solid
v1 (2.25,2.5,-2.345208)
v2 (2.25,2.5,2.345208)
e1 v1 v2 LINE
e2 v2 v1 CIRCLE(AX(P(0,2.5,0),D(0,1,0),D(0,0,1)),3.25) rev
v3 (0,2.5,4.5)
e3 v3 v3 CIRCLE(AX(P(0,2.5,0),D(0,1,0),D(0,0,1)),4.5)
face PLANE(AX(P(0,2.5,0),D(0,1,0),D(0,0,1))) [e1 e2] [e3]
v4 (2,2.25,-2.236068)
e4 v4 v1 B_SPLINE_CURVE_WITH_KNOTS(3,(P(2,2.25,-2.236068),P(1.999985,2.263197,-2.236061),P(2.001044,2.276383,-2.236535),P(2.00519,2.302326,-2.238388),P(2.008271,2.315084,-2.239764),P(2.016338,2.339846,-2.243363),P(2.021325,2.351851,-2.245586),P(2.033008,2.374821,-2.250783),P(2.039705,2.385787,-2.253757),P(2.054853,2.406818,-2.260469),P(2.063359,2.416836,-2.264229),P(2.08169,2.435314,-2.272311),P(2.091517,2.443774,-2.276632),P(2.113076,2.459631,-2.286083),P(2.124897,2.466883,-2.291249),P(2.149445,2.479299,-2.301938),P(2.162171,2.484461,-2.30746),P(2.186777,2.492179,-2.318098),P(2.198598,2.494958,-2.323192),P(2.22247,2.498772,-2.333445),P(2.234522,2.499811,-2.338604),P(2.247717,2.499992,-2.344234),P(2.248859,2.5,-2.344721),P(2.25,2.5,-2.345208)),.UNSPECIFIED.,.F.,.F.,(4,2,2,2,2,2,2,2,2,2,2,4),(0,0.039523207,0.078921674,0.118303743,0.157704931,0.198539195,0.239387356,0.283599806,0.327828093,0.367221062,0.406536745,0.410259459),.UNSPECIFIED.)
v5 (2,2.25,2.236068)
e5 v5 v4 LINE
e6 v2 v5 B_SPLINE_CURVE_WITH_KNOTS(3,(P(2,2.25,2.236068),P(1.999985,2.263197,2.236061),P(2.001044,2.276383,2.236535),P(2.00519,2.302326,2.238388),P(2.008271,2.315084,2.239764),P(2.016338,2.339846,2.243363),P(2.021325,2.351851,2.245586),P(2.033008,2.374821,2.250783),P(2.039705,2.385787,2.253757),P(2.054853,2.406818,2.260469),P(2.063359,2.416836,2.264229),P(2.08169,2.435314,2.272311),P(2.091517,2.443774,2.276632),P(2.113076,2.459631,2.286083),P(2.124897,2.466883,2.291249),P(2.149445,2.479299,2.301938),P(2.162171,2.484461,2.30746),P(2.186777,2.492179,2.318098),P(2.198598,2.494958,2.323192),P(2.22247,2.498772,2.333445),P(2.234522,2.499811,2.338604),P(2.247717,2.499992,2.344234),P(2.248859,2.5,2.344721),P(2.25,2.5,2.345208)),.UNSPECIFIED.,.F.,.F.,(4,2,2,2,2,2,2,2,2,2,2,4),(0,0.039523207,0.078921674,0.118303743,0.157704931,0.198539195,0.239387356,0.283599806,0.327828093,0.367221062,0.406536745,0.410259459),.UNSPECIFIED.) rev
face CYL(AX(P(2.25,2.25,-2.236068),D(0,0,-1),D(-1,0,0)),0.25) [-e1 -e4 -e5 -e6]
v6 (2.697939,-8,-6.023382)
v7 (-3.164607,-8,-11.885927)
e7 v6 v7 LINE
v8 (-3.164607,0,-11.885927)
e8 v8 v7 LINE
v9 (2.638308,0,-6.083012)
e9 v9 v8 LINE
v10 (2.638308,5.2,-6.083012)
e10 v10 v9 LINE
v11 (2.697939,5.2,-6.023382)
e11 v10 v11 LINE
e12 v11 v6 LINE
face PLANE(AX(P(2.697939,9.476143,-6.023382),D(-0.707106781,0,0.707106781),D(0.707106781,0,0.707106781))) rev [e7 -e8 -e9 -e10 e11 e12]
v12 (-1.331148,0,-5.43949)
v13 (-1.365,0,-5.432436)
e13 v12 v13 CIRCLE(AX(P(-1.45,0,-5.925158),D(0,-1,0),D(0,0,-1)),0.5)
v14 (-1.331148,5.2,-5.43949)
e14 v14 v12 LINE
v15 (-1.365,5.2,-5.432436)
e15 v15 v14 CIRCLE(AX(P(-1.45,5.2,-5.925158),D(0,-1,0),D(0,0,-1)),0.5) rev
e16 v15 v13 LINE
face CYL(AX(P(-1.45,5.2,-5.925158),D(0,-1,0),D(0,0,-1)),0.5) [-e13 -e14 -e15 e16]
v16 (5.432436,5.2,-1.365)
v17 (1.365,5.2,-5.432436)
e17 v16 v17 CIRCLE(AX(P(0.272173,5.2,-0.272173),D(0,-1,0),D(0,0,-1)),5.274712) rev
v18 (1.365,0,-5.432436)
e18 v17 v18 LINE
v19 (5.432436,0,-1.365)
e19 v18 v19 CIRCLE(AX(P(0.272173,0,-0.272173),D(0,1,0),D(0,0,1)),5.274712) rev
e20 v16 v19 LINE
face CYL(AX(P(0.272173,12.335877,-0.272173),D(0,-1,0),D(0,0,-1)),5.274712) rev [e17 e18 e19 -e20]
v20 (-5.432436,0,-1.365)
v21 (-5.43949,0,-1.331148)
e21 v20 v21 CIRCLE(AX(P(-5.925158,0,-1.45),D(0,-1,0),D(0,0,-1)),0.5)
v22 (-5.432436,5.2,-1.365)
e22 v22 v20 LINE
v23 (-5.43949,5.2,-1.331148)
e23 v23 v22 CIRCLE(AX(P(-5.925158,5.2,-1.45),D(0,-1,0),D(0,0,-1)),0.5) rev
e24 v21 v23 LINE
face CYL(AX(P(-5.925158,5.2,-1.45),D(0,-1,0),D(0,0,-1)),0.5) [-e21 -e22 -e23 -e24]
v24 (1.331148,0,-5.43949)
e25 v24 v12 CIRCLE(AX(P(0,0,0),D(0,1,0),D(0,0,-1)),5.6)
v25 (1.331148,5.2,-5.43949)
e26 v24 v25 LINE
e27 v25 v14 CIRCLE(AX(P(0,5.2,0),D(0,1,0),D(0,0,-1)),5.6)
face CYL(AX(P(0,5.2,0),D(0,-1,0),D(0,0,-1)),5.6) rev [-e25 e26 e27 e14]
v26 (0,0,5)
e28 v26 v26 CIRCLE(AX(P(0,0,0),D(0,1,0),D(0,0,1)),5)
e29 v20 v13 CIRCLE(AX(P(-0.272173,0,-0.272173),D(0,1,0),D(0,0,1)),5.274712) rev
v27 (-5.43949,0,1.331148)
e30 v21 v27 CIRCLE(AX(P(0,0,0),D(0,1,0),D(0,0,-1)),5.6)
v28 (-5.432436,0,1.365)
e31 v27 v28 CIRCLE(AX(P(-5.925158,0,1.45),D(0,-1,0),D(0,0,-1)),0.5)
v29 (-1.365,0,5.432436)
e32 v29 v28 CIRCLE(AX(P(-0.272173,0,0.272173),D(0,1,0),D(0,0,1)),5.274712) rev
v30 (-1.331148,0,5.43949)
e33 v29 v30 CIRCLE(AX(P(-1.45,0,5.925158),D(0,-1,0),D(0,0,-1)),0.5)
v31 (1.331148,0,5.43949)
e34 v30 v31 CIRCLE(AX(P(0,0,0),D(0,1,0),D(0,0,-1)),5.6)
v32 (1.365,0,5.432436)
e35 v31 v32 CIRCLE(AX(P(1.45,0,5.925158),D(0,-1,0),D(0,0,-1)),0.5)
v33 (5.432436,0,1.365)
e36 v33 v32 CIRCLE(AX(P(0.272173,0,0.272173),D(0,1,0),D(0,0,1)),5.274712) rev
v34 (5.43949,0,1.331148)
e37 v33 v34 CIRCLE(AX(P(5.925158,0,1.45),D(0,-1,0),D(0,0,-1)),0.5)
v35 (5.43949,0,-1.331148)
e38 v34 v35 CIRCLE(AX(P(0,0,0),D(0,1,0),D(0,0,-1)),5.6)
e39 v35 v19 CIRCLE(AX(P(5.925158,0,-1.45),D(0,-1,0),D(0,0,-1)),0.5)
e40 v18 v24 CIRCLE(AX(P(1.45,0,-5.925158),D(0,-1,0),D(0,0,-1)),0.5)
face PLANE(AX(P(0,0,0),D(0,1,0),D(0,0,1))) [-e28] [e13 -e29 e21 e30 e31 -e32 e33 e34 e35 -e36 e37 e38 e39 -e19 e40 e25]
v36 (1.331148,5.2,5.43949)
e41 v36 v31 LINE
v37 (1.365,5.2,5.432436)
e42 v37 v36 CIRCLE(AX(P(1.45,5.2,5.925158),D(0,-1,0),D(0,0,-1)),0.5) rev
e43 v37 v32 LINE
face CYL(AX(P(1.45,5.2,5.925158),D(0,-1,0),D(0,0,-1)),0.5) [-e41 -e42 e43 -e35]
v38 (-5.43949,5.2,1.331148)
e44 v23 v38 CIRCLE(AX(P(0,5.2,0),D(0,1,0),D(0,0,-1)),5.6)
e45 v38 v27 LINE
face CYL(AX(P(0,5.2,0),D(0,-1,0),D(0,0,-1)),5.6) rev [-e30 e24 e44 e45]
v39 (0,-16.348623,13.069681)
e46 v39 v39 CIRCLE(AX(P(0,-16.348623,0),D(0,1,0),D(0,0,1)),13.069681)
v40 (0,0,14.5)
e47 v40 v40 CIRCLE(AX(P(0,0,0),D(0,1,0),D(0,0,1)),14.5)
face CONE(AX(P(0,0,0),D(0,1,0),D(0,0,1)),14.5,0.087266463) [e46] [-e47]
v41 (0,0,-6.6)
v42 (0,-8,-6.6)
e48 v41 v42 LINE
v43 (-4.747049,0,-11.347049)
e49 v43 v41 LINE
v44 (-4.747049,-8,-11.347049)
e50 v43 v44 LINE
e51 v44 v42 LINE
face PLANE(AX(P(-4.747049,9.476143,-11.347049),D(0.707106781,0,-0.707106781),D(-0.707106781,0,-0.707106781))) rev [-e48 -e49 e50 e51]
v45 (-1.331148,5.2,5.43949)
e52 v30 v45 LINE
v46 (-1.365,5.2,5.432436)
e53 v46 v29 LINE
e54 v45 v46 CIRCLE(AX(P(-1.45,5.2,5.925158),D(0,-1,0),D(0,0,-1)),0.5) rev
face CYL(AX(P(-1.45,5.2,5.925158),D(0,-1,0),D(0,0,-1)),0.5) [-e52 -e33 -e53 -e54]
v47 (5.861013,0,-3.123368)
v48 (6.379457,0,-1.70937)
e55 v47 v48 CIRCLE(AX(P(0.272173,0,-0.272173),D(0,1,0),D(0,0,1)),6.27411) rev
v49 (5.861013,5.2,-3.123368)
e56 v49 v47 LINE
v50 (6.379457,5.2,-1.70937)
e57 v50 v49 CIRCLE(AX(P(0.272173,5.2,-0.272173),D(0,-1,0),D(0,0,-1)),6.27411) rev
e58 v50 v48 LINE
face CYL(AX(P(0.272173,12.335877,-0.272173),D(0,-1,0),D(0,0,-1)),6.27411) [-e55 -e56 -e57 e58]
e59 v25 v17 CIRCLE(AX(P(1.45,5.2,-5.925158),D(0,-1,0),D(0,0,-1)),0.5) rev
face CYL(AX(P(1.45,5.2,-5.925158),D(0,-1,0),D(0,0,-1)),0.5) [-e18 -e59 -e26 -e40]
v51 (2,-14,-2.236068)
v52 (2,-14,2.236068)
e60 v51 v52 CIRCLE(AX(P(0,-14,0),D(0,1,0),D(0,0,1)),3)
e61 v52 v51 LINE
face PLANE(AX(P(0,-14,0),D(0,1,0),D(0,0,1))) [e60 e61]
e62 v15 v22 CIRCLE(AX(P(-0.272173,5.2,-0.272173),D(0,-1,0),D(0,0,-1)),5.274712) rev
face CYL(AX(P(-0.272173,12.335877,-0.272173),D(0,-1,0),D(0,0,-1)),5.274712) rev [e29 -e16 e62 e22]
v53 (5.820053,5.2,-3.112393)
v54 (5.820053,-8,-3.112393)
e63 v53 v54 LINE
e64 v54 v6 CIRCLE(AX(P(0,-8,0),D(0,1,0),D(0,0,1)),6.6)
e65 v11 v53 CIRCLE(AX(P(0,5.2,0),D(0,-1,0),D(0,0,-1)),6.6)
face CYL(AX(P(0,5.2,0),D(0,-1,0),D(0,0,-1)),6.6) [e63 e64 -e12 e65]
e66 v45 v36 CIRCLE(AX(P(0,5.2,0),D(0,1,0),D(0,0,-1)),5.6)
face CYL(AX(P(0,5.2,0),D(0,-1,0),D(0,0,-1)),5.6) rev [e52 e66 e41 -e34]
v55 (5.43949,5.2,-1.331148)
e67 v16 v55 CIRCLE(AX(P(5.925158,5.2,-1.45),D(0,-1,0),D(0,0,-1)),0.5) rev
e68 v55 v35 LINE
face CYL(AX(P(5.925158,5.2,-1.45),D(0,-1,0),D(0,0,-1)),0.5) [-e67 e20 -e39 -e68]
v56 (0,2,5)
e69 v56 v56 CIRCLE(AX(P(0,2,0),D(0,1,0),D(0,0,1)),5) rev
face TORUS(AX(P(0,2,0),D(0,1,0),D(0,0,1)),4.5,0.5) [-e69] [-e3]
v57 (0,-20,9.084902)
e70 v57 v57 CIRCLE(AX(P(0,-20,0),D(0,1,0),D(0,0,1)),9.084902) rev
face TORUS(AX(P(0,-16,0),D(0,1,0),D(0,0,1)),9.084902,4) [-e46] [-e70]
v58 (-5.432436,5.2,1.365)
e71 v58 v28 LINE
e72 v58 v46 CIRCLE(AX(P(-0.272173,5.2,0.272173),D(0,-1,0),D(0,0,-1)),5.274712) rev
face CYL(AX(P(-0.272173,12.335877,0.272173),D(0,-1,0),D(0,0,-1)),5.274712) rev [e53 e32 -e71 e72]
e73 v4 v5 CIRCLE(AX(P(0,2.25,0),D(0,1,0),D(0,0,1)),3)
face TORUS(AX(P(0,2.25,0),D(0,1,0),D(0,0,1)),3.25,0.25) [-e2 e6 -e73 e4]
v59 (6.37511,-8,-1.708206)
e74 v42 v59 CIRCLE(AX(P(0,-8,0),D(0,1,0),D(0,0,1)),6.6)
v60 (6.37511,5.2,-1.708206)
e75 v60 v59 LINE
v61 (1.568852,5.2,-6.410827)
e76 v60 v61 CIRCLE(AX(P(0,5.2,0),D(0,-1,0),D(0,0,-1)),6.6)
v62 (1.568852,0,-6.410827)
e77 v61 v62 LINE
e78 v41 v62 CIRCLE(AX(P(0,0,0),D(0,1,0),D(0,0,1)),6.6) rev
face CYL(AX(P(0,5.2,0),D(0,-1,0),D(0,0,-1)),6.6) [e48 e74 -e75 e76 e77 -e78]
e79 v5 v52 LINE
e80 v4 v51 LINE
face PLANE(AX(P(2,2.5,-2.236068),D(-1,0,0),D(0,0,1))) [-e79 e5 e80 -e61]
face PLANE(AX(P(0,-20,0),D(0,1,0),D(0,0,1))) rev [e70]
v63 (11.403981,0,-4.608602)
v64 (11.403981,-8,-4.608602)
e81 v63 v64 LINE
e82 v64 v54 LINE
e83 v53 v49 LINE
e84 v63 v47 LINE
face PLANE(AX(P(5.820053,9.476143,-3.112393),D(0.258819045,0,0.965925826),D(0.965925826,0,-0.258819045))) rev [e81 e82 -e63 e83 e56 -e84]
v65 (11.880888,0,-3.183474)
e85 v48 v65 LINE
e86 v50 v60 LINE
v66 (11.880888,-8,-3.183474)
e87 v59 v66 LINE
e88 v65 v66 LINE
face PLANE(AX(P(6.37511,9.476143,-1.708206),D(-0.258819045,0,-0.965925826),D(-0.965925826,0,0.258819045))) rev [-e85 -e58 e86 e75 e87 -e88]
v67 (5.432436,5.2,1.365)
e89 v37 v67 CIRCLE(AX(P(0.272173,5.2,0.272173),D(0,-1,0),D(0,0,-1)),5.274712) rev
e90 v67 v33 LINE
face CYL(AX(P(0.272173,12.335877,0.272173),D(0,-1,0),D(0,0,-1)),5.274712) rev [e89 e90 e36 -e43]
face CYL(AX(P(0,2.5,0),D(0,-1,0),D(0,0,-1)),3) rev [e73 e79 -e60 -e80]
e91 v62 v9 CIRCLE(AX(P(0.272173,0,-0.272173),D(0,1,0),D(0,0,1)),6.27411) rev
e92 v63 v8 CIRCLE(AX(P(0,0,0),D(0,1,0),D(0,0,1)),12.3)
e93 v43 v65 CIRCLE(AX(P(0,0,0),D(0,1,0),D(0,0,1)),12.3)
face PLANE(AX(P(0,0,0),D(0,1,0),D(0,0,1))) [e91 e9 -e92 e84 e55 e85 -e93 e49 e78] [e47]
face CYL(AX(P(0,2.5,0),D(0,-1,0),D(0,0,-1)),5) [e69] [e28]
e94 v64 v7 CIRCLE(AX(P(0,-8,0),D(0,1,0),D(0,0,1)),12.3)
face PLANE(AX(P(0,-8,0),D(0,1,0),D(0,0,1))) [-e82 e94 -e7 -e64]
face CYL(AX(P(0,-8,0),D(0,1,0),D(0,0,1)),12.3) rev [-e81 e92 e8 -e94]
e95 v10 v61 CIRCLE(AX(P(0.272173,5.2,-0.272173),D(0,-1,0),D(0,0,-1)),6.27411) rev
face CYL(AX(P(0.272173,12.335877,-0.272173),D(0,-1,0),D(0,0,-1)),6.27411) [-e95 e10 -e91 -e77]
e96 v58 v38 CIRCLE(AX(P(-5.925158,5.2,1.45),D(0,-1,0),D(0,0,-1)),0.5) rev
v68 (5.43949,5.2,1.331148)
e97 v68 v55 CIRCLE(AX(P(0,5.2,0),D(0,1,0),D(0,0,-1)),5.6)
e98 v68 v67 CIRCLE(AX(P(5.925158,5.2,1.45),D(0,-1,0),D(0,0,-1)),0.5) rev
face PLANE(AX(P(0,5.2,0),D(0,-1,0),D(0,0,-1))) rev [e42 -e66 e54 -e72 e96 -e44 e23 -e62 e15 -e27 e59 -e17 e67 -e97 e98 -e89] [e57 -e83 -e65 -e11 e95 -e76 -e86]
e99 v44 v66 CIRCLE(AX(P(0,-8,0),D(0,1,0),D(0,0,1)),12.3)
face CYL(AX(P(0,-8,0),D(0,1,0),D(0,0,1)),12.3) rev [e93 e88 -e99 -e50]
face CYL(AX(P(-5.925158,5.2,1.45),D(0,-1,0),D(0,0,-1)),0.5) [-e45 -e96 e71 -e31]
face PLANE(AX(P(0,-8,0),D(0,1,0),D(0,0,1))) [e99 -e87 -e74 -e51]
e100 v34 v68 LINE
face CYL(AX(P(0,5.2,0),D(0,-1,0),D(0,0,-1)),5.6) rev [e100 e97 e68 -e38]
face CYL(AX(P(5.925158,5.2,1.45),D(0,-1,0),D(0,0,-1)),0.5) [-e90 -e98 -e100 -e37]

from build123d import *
from build123d.topology import SkipClean

# Parameters (mm, degrees)
SKETCH1_R             = 5
BOSS_EXTRUDE1_DEPTH   = 2.5
BOSS_EXTRUDE2_DEPTH   = 5.2
BOSS_EXTRUDE2_2_DEPTH = 5.2
BOSS_EXTRUDE2_3_DEPTH = 5.2
BOSS_EXTRUDE2_4_DEPTH = 5.2
FILLET1_R             = 0.5
FILLET2_R             = 0.5
FILLET3_R             = 0.5
FILLET4_R             = 0.5
SKETCH3_R             = 14.5
BOSS_EXTRUDE3_DEPTH   = 20
SKETCH4_OUTSIDE_W     = 44.126
SKETCH4_OUTSIDE_H     = 44.126
SKETCH4_OUTSIDE_R     = 14.5
CUT_EXTRUDE2_DEPTH    = 20
CUT_EXTRUDE2_DRAFT    = 5
FILLET5_R             = 4
CUT_EXTRUDE3_START    = -14
CUT_EXTRUDE3_DEPTH    = 14
FILLET6_R             = 0.25
FILLET7_R             = 0.5
CUT_EXTRUDE4_START    = -8
SKETCH6_R             = 12.3
SKETCH6_R_2           = 6.6
CUT_EXTRUDE4_DEPTH    = 8
BOSS_EXTRUDE4_DEPTH   = 8
BOSS_EXTRUDE5_DEPTH   = 5.2


# Read off the part's stored shape, not the designer's step: Boss-Extrude5
with BuildPart() as part:
    # Sketch1 → Boss-Extrude1 (new body)
    with BuildSketch(Plane(origin=(0, 0, 0), x_dir=(1, 0, 0), z_dir=(0, 1, 0))):
        with Locations(Location((0, 0, 0), (0, 0, 270))):
            Circle(SKETCH1_R)
        with BuildLine():
            Line((2, 2.236067977), (2, -2.236067977))
            ThreePointArc((2, -2.236067977), (-3, 0), (2, 2.236067977))
        make_face(mode=Mode.SUBTRACT)
    extrude(amount=BOSS_EXTRUDE1_DEPTH)



with BuildPart() as body_2:
    # Sketch2 → Boss-Extrude2 (new body)
    with BuildSketch(Plane.XZ):
        with BuildLine():
            Line((-6.305354867, 1.95), (-5.249523788, 1.95))
            ThreePointArc((-5.249523788, 1.95), (-5.6, 0), (-5.249523788, -1.95))
            Line((-5.249523788, -1.95), (-6.305354867, -1.95))
            ThreePointArc((-6.305354867, -1.95), (-6.6, 0), (-6.305354867, 1.95))
        make_face()
    extrude(amount=-BOSS_EXTRUDE2_DEPTH)

    # Fillet4
    fillet4_edges = [body_2.edges().sort_by_distance(p)[0] for p in [
        (-6.305354867, 2.6, 1.95),
        (-5.249523788, 2.6, -1.95),
        (-6.305354867, 2.6, -1.95),
        (-5.249523788, 2.6, 1.95),
    ]]
    fillet(fillet4_edges, radius=FILLET4_R - 0.0001)  # a hair under: the kernel refuses the full size


with BuildPart() as body_3:
    # Sketch2 → Boss-Extrude2 2 (new body)
    with BuildSketch(Plane.XZ):
        with BuildLine():
            Line((-1.95, 6.305354867), (-1.95, 5.249523788))
            ThreePointArc((-1.95, 5.249523788), (0, 5.6), (1.95, 5.249523788))
            Line((1.95, 5.249523788), (1.95, 6.305354867))
            ThreePointArc((1.95, 6.305354867), (0, 6.6), (-1.95, 6.305354867))
        make_face()
    extrude(amount=-BOSS_EXTRUDE2_2_DEPTH)

    # Fillet3
    fillet3_edges = [body_3.edges().sort_by_distance(p)[0] for p in [
        (-1.95, 2.6, 6.305354867),
        (-1.95, 2.6, 5.249523788),
        (1.95, 2.6, 6.305354867),
        (1.95, 2.6, 5.249523788),
    ]]
    fillet(fillet3_edges, radius=FILLET3_R - 0.0001)  # a hair under: the kernel refuses the full size


with BuildPart() as body_4:
    # Sketch2 → Boss-Extrude2 3 (new body)
    with BuildSketch(Plane.XZ):
        with BuildLine():
            Line((6.305354867, 1.95), (5.249523788, 1.95))
            ThreePointArc((5.249523788, 1.95), (5.6, 0), (5.249523788, -1.95))
            Line((5.249523788, -1.95), (6.305354867, -1.95))
            ThreePointArc((6.305354867, -1.95), (6.6, 0), (6.305354867, 1.95))
        make_face()
    extrude(amount=-BOSS_EXTRUDE2_3_DEPTH)

    # Fillet2
    fillet2_edges = [body_4.edges().sort_by_distance(p)[0] for p in [
        (6.305354867, 2.6, 1.95),
        (6.305354867, 2.6, -1.95),
        (5.249523788, 2.6, -1.95),
        (5.249523788, 2.6, 1.95),
    ]]
    fillet(fillet2_edges, radius=FILLET2_R - 0.0001)  # a hair under: the kernel refuses the full size


with BuildPart() as body_5:
    # Sketch2 → Boss-Extrude2 4 (new body)
    with BuildSketch(Plane.XZ):
        with BuildLine():
            Line((1.95, -6.305354867), (1.95, -5.249523788))
            ThreePointArc((1.95, -5.249523788), (0, -5.6), (-1.95, -5.249523788))
            Line((-1.95, -5.249523788), (-1.95, -6.305354867))
            ThreePointArc((-1.95, -6.305354867), (0, -6.6), (1.95, -6.305354867))
        make_face()
    extrude(amount=-BOSS_EXTRUDE2_4_DEPTH)

    # Fillet1
    fillet1_edges = [body_5.edges().sort_by_distance(p)[0] for p in [
        (1.95, 2.6, -6.305354867),
        (-1.95, 2.6, -6.305354867),
        (1.95, 2.6, -5.249523788),
        (-1.95, 2.6, -5.249523788),
    ]]
    fillet(fillet1_edges, radius=FILLET1_R - 0.0001)  # a hair under: the kernel refuses the full size


with BuildPart() as part_1:
    add(part.part)

    add(body_2.part)  # Boss-Extrude3 merges body 2

    add(body_3.part)  # Boss-Extrude3 merges body 3

    add(body_4.part)  # Boss-Extrude3 merges body 4

    add(body_5.part)  # Boss-Extrude3 merges body 5
    # Sketch3 → Boss-Extrude3 (add)
    with BuildSketch(Plane(origin=(0, 0, 0), x_dir=(1, 0, 0), z_dir=(0, 1, 0))):
        with Locations(Location((0, 0, 0), (0, 0, 270))):
            Circle(SKETCH3_R)
    extrude(amount=-BOSS_EXTRUDE3_DEPTH)


with BuildPart() as cut_extrude2_tool:
    # Sketch4 outside → Cut-Extrude2 (with draft: the straight prism first)
    with BuildSketch(Plane(origin=(0, 0, 0), x_dir=(1, 0, 0), z_dir=(0, 1, 0))):
        Rectangle(SKETCH4_OUTSIDE_W, SKETCH4_OUTSIDE_H)
        Circle(SKETCH4_OUTSIDE_R, mode=Mode.SUBTRACT)
    extrude(amount=-CUT_EXTRUDE2_DEPTH)
    # Cut-Extrude2: the draft: its side faces are tilted about the plane it starts from
    cut_extrude2_sides = [cut_extrude2_tool.faces().sort_by_distance(p)[0] for p in [
        (0, -10, 22.063),
        (22.063, -10, 0),
        (0, -10, -22.063),
        (-22.063, -10, 0),
        (-14.5, -10, 0),
    ]]
    draft(cut_extrude2_sides, Plane(origin=(0, 0, 0), x_dir=(1, 0, 0), z_dir=(0, 1, 0)), CUT_EXTRUDE2_DRAFT)


with BuildPart() as part_2:
    add(part_1.part)

    # Cut-Extrude2: cut by cut_extrude2_tool
    add(cut_extrude2_tool.part, mode=Mode.SUBTRACT)

    # Fillet5
    fillet5_edges = [part_2.edges().sort_by_distance(p)[0] for p in [
        (-12.750226729, -20, 0),
    ]]
    fillet(fillet5_edges, radius=FILLET5_R)

    # Sketch5 → Cut-Extrude3 (cut)
    with SkipClean():  # the faces are left unmerged after this step: merging them gives an invalid solid
        with BuildSketch(Plane(origin=(0, 0, 0), x_dir=(1, 0, 0), z_dir=(0, 1, 0)).offset(CUT_EXTRUDE3_START)):
            with BuildLine():
                Line((2, -2.236067977), (2, 2.236067977))
                ThreePointArc((2, 2.236067977), (-3, 0), (2, -2.236067977))
            make_face()
        extrude(amount=CUT_EXTRUDE3_DEPTH, mode=Mode.SUBTRACT)

    # Fillet6
    fillet6_edges = [part_2.edges().sort_by_distance(p)[0] for p in [
        (-3, 2.5, 0),
        (2, 2.5, 0),
    ]]
    fillet(fillet6_edges, radius=FILLET6_R)

    # Fillet7
    fillet7_edges = [part_2.edges().sort_by_distance(p)[0] for p in [
        (0, 2.5, -5),
    ]]
    fillet(fillet7_edges, radius=FILLET7_R)

    # Sketch6 → Cut-Extrude4 (cut)
    with SkipClean():  # the faces are left unmerged after this step: merging them gives an invalid solid
        with BuildSketch(Plane(origin=(0, 0, 0), x_dir=(1, 0, 0), z_dir=(0, 1, 0)).offset(CUT_EXTRUDE4_START)):
            with Locations(Location((0, 0, 0), (0, 0, 270))):
                Circle(SKETCH6_R)
            with Locations(Location((0, 0, 0), (0, 0, 76.248877743))):
                Circle(SKETCH6_R_2, mode=Mode.SUBTRACT)
        extrude(amount=CUT_EXTRUDE4_DEPTH, mode=Mode.SUBTRACT)

    # Sketch7 → Boss-Extrude4 (add)
    with SkipClean():  # the faces are left unmerged after this step: merging them gives an invalid solid
        with BuildSketch(Plane(origin=(0, -8, 0), x_dir=(1, 0, 0), z_dir=(0, 1, 0))):
            with BuildLine():
                Line((6.375110454, 1.708205698), (11.880887663, 3.183474255))
                ThreePointArc((11.880887663, 3.183474255), (11.664219973, 3.903328376), (11.40398128, 4.608601845))
                Line((11.40398128, 4.608601845), (5.820052572, 3.112392657))
                ThreePointArc((5.820052572, 3.112392657), (6.137868976, 2.426224317), (6.375110454, 1.708205698))
            make_face()
            with BuildLine():
                Line((2.697938648, 6.023381696), (-3.164606791, 11.885927135))
                ThreePointArc((-3.164606791, 11.885927135), (-3.964993354, 11.643402754), (-4.747049149, 11.347049149))
                Line((-4.747049149, 11.347049149), (0, 6.6))
                ThreePointArc((0, 6.6), (1.379434813, 6.454235787), (2.697938648, 6.023381696))
            make_face()
        extrude(amount=BOSS_EXTRUDE4_DEPTH)

    # Boss-Extrude5 outline → Boss-Extrude5 (add)
    with SkipClean():  # the faces are left unmerged after this step: merging them gives an invalid solid
        with BuildSketch(Plane(origin=(0, 0, 0), x_dir=(1, 0, 0), z_dir=(0, 1, 0))):
            with BuildLine():
                ThreePointArc((5.820052572, 3.112392657), (4.500834134, 4.827265489), (2.697938648, 6.023381696))
                Line((2.697938648, 6.023381696), (2.63830786, 6.083012483))
                ThreePointArc((2.63830786, 6.083012483), (2.110900212, 6.270800504), (1.568852459, 6.410826933))
                ThreePointArc((1.568852459, 6.410826933), (1.84333588, 6.233843964), (1.95, 5.925158226))
                ThreePointArc((1.95, 5.925158226), (1.772102461, 5.542731755), (1.36499998, 5.432436198))
                ThreePointArc((1.36499998, 5.432436198), (4.001957645, 4.001957645), (5.432436198, 1.36499998))
                ThreePointArc((5.432436198, 1.36499998), (5.542731755, 1.772102461), (5.925158226, 1.95))
                ThreePointArc((5.925158226, 1.95), (6.233843964, 1.84333588), (6.410826933, 1.568852459))
                ThreePointArc((6.410826933, 1.568852459), (6.393348383, 1.638626394), (6.375110454, 1.708205698))
                Line((6.375110454, 1.708205698), (6.379456664, 1.709370261))
                ThreePointArc((6.379456664, 1.709370261), (6.162816143, 2.431981568), (5.861013343, 3.123368063))
                Line((5.861013343, 3.123368063), (5.820052572, 3.112392657))
            make_face()
            with BuildLine():
                ThreePointArc((-1.95, 5.925158226), (-1.84333588, 6.233843964), (-1.568852459, 6.410826933))
                ThreePointArc((-1.568852459, 6.410826933), (-4.666904756, 4.666904756), (-6.410826932, 1.568852459))
                ThreePointArc((-6.410826932, 1.568852459), (-6.233843964, 1.84333588), (-5.925158226, 1.95))
                ThreePointArc((-5.925158226, 1.95), (-5.542731755, 1.772102461), (-5.432436198, 1.36499998))
                ThreePointArc((-5.432436198, 1.36499998), (-4.001957645, 4.001957645), (-1.36499998, 5.432436198))
                ThreePointArc((-1.36499998, 5.432436198), (-1.772102461, 5.542731755), (-1.95, 5.925158226))
            make_face()
            with BuildLine():
                ThreePointArc((-5.925158226, -1.95), (-6.233843964, -1.84333588), (-6.410826933, -1.568852459))
                ThreePointArc((-6.410826933, -1.568852459), (-4.666904756, -4.666904756), (-1.568852459, -6.410826933))
                ThreePointArc((-1.568852459, -6.410826933), (-1.84333588, -6.233843964), (-1.95, -5.925158226))
                ThreePointArc((-1.95, -5.925158226), (-1.772102461, -5.542731755), (-1.36499998, -5.432436198))
                ThreePointArc((-1.36499998, -5.432436198), (-4.001957645, -4.001957645), (-5.432436198, -1.36499998))
                ThreePointArc((-5.432436198, -1.36499998), (-5.542731755, -1.772102461), (-5.925158226, -1.95))
            make_face()
            with BuildLine():
                ThreePointArc((1.568852459, -6.410826933), (4.666904756, -4.666904756), (6.410826933, -1.568852459))
                ThreePointArc((6.410826933, -1.568852459), (6.233843964, -1.84333588), (5.925158226, -1.95))
                ThreePointArc((5.925158226, -1.95), (5.542731755, -1.772102461), (5.432436198, -1.36499998))
                ThreePointArc((5.432436198, -1.36499998), (4.001957645, -4.001957645), (1.36499998, -5.432436198))
                ThreePointArc((1.36499998, -5.432436198), (1.772102461, -5.542731755), (1.95, -5.925158226))
                ThreePointArc((1.95, -5.925158226), (1.84333588, -6.233843964), (1.568852459, -6.410826933))
            make_face()
        extrude(amount=BOSS_EXTRUDE5_DEPTH)


solid = part_2.part
